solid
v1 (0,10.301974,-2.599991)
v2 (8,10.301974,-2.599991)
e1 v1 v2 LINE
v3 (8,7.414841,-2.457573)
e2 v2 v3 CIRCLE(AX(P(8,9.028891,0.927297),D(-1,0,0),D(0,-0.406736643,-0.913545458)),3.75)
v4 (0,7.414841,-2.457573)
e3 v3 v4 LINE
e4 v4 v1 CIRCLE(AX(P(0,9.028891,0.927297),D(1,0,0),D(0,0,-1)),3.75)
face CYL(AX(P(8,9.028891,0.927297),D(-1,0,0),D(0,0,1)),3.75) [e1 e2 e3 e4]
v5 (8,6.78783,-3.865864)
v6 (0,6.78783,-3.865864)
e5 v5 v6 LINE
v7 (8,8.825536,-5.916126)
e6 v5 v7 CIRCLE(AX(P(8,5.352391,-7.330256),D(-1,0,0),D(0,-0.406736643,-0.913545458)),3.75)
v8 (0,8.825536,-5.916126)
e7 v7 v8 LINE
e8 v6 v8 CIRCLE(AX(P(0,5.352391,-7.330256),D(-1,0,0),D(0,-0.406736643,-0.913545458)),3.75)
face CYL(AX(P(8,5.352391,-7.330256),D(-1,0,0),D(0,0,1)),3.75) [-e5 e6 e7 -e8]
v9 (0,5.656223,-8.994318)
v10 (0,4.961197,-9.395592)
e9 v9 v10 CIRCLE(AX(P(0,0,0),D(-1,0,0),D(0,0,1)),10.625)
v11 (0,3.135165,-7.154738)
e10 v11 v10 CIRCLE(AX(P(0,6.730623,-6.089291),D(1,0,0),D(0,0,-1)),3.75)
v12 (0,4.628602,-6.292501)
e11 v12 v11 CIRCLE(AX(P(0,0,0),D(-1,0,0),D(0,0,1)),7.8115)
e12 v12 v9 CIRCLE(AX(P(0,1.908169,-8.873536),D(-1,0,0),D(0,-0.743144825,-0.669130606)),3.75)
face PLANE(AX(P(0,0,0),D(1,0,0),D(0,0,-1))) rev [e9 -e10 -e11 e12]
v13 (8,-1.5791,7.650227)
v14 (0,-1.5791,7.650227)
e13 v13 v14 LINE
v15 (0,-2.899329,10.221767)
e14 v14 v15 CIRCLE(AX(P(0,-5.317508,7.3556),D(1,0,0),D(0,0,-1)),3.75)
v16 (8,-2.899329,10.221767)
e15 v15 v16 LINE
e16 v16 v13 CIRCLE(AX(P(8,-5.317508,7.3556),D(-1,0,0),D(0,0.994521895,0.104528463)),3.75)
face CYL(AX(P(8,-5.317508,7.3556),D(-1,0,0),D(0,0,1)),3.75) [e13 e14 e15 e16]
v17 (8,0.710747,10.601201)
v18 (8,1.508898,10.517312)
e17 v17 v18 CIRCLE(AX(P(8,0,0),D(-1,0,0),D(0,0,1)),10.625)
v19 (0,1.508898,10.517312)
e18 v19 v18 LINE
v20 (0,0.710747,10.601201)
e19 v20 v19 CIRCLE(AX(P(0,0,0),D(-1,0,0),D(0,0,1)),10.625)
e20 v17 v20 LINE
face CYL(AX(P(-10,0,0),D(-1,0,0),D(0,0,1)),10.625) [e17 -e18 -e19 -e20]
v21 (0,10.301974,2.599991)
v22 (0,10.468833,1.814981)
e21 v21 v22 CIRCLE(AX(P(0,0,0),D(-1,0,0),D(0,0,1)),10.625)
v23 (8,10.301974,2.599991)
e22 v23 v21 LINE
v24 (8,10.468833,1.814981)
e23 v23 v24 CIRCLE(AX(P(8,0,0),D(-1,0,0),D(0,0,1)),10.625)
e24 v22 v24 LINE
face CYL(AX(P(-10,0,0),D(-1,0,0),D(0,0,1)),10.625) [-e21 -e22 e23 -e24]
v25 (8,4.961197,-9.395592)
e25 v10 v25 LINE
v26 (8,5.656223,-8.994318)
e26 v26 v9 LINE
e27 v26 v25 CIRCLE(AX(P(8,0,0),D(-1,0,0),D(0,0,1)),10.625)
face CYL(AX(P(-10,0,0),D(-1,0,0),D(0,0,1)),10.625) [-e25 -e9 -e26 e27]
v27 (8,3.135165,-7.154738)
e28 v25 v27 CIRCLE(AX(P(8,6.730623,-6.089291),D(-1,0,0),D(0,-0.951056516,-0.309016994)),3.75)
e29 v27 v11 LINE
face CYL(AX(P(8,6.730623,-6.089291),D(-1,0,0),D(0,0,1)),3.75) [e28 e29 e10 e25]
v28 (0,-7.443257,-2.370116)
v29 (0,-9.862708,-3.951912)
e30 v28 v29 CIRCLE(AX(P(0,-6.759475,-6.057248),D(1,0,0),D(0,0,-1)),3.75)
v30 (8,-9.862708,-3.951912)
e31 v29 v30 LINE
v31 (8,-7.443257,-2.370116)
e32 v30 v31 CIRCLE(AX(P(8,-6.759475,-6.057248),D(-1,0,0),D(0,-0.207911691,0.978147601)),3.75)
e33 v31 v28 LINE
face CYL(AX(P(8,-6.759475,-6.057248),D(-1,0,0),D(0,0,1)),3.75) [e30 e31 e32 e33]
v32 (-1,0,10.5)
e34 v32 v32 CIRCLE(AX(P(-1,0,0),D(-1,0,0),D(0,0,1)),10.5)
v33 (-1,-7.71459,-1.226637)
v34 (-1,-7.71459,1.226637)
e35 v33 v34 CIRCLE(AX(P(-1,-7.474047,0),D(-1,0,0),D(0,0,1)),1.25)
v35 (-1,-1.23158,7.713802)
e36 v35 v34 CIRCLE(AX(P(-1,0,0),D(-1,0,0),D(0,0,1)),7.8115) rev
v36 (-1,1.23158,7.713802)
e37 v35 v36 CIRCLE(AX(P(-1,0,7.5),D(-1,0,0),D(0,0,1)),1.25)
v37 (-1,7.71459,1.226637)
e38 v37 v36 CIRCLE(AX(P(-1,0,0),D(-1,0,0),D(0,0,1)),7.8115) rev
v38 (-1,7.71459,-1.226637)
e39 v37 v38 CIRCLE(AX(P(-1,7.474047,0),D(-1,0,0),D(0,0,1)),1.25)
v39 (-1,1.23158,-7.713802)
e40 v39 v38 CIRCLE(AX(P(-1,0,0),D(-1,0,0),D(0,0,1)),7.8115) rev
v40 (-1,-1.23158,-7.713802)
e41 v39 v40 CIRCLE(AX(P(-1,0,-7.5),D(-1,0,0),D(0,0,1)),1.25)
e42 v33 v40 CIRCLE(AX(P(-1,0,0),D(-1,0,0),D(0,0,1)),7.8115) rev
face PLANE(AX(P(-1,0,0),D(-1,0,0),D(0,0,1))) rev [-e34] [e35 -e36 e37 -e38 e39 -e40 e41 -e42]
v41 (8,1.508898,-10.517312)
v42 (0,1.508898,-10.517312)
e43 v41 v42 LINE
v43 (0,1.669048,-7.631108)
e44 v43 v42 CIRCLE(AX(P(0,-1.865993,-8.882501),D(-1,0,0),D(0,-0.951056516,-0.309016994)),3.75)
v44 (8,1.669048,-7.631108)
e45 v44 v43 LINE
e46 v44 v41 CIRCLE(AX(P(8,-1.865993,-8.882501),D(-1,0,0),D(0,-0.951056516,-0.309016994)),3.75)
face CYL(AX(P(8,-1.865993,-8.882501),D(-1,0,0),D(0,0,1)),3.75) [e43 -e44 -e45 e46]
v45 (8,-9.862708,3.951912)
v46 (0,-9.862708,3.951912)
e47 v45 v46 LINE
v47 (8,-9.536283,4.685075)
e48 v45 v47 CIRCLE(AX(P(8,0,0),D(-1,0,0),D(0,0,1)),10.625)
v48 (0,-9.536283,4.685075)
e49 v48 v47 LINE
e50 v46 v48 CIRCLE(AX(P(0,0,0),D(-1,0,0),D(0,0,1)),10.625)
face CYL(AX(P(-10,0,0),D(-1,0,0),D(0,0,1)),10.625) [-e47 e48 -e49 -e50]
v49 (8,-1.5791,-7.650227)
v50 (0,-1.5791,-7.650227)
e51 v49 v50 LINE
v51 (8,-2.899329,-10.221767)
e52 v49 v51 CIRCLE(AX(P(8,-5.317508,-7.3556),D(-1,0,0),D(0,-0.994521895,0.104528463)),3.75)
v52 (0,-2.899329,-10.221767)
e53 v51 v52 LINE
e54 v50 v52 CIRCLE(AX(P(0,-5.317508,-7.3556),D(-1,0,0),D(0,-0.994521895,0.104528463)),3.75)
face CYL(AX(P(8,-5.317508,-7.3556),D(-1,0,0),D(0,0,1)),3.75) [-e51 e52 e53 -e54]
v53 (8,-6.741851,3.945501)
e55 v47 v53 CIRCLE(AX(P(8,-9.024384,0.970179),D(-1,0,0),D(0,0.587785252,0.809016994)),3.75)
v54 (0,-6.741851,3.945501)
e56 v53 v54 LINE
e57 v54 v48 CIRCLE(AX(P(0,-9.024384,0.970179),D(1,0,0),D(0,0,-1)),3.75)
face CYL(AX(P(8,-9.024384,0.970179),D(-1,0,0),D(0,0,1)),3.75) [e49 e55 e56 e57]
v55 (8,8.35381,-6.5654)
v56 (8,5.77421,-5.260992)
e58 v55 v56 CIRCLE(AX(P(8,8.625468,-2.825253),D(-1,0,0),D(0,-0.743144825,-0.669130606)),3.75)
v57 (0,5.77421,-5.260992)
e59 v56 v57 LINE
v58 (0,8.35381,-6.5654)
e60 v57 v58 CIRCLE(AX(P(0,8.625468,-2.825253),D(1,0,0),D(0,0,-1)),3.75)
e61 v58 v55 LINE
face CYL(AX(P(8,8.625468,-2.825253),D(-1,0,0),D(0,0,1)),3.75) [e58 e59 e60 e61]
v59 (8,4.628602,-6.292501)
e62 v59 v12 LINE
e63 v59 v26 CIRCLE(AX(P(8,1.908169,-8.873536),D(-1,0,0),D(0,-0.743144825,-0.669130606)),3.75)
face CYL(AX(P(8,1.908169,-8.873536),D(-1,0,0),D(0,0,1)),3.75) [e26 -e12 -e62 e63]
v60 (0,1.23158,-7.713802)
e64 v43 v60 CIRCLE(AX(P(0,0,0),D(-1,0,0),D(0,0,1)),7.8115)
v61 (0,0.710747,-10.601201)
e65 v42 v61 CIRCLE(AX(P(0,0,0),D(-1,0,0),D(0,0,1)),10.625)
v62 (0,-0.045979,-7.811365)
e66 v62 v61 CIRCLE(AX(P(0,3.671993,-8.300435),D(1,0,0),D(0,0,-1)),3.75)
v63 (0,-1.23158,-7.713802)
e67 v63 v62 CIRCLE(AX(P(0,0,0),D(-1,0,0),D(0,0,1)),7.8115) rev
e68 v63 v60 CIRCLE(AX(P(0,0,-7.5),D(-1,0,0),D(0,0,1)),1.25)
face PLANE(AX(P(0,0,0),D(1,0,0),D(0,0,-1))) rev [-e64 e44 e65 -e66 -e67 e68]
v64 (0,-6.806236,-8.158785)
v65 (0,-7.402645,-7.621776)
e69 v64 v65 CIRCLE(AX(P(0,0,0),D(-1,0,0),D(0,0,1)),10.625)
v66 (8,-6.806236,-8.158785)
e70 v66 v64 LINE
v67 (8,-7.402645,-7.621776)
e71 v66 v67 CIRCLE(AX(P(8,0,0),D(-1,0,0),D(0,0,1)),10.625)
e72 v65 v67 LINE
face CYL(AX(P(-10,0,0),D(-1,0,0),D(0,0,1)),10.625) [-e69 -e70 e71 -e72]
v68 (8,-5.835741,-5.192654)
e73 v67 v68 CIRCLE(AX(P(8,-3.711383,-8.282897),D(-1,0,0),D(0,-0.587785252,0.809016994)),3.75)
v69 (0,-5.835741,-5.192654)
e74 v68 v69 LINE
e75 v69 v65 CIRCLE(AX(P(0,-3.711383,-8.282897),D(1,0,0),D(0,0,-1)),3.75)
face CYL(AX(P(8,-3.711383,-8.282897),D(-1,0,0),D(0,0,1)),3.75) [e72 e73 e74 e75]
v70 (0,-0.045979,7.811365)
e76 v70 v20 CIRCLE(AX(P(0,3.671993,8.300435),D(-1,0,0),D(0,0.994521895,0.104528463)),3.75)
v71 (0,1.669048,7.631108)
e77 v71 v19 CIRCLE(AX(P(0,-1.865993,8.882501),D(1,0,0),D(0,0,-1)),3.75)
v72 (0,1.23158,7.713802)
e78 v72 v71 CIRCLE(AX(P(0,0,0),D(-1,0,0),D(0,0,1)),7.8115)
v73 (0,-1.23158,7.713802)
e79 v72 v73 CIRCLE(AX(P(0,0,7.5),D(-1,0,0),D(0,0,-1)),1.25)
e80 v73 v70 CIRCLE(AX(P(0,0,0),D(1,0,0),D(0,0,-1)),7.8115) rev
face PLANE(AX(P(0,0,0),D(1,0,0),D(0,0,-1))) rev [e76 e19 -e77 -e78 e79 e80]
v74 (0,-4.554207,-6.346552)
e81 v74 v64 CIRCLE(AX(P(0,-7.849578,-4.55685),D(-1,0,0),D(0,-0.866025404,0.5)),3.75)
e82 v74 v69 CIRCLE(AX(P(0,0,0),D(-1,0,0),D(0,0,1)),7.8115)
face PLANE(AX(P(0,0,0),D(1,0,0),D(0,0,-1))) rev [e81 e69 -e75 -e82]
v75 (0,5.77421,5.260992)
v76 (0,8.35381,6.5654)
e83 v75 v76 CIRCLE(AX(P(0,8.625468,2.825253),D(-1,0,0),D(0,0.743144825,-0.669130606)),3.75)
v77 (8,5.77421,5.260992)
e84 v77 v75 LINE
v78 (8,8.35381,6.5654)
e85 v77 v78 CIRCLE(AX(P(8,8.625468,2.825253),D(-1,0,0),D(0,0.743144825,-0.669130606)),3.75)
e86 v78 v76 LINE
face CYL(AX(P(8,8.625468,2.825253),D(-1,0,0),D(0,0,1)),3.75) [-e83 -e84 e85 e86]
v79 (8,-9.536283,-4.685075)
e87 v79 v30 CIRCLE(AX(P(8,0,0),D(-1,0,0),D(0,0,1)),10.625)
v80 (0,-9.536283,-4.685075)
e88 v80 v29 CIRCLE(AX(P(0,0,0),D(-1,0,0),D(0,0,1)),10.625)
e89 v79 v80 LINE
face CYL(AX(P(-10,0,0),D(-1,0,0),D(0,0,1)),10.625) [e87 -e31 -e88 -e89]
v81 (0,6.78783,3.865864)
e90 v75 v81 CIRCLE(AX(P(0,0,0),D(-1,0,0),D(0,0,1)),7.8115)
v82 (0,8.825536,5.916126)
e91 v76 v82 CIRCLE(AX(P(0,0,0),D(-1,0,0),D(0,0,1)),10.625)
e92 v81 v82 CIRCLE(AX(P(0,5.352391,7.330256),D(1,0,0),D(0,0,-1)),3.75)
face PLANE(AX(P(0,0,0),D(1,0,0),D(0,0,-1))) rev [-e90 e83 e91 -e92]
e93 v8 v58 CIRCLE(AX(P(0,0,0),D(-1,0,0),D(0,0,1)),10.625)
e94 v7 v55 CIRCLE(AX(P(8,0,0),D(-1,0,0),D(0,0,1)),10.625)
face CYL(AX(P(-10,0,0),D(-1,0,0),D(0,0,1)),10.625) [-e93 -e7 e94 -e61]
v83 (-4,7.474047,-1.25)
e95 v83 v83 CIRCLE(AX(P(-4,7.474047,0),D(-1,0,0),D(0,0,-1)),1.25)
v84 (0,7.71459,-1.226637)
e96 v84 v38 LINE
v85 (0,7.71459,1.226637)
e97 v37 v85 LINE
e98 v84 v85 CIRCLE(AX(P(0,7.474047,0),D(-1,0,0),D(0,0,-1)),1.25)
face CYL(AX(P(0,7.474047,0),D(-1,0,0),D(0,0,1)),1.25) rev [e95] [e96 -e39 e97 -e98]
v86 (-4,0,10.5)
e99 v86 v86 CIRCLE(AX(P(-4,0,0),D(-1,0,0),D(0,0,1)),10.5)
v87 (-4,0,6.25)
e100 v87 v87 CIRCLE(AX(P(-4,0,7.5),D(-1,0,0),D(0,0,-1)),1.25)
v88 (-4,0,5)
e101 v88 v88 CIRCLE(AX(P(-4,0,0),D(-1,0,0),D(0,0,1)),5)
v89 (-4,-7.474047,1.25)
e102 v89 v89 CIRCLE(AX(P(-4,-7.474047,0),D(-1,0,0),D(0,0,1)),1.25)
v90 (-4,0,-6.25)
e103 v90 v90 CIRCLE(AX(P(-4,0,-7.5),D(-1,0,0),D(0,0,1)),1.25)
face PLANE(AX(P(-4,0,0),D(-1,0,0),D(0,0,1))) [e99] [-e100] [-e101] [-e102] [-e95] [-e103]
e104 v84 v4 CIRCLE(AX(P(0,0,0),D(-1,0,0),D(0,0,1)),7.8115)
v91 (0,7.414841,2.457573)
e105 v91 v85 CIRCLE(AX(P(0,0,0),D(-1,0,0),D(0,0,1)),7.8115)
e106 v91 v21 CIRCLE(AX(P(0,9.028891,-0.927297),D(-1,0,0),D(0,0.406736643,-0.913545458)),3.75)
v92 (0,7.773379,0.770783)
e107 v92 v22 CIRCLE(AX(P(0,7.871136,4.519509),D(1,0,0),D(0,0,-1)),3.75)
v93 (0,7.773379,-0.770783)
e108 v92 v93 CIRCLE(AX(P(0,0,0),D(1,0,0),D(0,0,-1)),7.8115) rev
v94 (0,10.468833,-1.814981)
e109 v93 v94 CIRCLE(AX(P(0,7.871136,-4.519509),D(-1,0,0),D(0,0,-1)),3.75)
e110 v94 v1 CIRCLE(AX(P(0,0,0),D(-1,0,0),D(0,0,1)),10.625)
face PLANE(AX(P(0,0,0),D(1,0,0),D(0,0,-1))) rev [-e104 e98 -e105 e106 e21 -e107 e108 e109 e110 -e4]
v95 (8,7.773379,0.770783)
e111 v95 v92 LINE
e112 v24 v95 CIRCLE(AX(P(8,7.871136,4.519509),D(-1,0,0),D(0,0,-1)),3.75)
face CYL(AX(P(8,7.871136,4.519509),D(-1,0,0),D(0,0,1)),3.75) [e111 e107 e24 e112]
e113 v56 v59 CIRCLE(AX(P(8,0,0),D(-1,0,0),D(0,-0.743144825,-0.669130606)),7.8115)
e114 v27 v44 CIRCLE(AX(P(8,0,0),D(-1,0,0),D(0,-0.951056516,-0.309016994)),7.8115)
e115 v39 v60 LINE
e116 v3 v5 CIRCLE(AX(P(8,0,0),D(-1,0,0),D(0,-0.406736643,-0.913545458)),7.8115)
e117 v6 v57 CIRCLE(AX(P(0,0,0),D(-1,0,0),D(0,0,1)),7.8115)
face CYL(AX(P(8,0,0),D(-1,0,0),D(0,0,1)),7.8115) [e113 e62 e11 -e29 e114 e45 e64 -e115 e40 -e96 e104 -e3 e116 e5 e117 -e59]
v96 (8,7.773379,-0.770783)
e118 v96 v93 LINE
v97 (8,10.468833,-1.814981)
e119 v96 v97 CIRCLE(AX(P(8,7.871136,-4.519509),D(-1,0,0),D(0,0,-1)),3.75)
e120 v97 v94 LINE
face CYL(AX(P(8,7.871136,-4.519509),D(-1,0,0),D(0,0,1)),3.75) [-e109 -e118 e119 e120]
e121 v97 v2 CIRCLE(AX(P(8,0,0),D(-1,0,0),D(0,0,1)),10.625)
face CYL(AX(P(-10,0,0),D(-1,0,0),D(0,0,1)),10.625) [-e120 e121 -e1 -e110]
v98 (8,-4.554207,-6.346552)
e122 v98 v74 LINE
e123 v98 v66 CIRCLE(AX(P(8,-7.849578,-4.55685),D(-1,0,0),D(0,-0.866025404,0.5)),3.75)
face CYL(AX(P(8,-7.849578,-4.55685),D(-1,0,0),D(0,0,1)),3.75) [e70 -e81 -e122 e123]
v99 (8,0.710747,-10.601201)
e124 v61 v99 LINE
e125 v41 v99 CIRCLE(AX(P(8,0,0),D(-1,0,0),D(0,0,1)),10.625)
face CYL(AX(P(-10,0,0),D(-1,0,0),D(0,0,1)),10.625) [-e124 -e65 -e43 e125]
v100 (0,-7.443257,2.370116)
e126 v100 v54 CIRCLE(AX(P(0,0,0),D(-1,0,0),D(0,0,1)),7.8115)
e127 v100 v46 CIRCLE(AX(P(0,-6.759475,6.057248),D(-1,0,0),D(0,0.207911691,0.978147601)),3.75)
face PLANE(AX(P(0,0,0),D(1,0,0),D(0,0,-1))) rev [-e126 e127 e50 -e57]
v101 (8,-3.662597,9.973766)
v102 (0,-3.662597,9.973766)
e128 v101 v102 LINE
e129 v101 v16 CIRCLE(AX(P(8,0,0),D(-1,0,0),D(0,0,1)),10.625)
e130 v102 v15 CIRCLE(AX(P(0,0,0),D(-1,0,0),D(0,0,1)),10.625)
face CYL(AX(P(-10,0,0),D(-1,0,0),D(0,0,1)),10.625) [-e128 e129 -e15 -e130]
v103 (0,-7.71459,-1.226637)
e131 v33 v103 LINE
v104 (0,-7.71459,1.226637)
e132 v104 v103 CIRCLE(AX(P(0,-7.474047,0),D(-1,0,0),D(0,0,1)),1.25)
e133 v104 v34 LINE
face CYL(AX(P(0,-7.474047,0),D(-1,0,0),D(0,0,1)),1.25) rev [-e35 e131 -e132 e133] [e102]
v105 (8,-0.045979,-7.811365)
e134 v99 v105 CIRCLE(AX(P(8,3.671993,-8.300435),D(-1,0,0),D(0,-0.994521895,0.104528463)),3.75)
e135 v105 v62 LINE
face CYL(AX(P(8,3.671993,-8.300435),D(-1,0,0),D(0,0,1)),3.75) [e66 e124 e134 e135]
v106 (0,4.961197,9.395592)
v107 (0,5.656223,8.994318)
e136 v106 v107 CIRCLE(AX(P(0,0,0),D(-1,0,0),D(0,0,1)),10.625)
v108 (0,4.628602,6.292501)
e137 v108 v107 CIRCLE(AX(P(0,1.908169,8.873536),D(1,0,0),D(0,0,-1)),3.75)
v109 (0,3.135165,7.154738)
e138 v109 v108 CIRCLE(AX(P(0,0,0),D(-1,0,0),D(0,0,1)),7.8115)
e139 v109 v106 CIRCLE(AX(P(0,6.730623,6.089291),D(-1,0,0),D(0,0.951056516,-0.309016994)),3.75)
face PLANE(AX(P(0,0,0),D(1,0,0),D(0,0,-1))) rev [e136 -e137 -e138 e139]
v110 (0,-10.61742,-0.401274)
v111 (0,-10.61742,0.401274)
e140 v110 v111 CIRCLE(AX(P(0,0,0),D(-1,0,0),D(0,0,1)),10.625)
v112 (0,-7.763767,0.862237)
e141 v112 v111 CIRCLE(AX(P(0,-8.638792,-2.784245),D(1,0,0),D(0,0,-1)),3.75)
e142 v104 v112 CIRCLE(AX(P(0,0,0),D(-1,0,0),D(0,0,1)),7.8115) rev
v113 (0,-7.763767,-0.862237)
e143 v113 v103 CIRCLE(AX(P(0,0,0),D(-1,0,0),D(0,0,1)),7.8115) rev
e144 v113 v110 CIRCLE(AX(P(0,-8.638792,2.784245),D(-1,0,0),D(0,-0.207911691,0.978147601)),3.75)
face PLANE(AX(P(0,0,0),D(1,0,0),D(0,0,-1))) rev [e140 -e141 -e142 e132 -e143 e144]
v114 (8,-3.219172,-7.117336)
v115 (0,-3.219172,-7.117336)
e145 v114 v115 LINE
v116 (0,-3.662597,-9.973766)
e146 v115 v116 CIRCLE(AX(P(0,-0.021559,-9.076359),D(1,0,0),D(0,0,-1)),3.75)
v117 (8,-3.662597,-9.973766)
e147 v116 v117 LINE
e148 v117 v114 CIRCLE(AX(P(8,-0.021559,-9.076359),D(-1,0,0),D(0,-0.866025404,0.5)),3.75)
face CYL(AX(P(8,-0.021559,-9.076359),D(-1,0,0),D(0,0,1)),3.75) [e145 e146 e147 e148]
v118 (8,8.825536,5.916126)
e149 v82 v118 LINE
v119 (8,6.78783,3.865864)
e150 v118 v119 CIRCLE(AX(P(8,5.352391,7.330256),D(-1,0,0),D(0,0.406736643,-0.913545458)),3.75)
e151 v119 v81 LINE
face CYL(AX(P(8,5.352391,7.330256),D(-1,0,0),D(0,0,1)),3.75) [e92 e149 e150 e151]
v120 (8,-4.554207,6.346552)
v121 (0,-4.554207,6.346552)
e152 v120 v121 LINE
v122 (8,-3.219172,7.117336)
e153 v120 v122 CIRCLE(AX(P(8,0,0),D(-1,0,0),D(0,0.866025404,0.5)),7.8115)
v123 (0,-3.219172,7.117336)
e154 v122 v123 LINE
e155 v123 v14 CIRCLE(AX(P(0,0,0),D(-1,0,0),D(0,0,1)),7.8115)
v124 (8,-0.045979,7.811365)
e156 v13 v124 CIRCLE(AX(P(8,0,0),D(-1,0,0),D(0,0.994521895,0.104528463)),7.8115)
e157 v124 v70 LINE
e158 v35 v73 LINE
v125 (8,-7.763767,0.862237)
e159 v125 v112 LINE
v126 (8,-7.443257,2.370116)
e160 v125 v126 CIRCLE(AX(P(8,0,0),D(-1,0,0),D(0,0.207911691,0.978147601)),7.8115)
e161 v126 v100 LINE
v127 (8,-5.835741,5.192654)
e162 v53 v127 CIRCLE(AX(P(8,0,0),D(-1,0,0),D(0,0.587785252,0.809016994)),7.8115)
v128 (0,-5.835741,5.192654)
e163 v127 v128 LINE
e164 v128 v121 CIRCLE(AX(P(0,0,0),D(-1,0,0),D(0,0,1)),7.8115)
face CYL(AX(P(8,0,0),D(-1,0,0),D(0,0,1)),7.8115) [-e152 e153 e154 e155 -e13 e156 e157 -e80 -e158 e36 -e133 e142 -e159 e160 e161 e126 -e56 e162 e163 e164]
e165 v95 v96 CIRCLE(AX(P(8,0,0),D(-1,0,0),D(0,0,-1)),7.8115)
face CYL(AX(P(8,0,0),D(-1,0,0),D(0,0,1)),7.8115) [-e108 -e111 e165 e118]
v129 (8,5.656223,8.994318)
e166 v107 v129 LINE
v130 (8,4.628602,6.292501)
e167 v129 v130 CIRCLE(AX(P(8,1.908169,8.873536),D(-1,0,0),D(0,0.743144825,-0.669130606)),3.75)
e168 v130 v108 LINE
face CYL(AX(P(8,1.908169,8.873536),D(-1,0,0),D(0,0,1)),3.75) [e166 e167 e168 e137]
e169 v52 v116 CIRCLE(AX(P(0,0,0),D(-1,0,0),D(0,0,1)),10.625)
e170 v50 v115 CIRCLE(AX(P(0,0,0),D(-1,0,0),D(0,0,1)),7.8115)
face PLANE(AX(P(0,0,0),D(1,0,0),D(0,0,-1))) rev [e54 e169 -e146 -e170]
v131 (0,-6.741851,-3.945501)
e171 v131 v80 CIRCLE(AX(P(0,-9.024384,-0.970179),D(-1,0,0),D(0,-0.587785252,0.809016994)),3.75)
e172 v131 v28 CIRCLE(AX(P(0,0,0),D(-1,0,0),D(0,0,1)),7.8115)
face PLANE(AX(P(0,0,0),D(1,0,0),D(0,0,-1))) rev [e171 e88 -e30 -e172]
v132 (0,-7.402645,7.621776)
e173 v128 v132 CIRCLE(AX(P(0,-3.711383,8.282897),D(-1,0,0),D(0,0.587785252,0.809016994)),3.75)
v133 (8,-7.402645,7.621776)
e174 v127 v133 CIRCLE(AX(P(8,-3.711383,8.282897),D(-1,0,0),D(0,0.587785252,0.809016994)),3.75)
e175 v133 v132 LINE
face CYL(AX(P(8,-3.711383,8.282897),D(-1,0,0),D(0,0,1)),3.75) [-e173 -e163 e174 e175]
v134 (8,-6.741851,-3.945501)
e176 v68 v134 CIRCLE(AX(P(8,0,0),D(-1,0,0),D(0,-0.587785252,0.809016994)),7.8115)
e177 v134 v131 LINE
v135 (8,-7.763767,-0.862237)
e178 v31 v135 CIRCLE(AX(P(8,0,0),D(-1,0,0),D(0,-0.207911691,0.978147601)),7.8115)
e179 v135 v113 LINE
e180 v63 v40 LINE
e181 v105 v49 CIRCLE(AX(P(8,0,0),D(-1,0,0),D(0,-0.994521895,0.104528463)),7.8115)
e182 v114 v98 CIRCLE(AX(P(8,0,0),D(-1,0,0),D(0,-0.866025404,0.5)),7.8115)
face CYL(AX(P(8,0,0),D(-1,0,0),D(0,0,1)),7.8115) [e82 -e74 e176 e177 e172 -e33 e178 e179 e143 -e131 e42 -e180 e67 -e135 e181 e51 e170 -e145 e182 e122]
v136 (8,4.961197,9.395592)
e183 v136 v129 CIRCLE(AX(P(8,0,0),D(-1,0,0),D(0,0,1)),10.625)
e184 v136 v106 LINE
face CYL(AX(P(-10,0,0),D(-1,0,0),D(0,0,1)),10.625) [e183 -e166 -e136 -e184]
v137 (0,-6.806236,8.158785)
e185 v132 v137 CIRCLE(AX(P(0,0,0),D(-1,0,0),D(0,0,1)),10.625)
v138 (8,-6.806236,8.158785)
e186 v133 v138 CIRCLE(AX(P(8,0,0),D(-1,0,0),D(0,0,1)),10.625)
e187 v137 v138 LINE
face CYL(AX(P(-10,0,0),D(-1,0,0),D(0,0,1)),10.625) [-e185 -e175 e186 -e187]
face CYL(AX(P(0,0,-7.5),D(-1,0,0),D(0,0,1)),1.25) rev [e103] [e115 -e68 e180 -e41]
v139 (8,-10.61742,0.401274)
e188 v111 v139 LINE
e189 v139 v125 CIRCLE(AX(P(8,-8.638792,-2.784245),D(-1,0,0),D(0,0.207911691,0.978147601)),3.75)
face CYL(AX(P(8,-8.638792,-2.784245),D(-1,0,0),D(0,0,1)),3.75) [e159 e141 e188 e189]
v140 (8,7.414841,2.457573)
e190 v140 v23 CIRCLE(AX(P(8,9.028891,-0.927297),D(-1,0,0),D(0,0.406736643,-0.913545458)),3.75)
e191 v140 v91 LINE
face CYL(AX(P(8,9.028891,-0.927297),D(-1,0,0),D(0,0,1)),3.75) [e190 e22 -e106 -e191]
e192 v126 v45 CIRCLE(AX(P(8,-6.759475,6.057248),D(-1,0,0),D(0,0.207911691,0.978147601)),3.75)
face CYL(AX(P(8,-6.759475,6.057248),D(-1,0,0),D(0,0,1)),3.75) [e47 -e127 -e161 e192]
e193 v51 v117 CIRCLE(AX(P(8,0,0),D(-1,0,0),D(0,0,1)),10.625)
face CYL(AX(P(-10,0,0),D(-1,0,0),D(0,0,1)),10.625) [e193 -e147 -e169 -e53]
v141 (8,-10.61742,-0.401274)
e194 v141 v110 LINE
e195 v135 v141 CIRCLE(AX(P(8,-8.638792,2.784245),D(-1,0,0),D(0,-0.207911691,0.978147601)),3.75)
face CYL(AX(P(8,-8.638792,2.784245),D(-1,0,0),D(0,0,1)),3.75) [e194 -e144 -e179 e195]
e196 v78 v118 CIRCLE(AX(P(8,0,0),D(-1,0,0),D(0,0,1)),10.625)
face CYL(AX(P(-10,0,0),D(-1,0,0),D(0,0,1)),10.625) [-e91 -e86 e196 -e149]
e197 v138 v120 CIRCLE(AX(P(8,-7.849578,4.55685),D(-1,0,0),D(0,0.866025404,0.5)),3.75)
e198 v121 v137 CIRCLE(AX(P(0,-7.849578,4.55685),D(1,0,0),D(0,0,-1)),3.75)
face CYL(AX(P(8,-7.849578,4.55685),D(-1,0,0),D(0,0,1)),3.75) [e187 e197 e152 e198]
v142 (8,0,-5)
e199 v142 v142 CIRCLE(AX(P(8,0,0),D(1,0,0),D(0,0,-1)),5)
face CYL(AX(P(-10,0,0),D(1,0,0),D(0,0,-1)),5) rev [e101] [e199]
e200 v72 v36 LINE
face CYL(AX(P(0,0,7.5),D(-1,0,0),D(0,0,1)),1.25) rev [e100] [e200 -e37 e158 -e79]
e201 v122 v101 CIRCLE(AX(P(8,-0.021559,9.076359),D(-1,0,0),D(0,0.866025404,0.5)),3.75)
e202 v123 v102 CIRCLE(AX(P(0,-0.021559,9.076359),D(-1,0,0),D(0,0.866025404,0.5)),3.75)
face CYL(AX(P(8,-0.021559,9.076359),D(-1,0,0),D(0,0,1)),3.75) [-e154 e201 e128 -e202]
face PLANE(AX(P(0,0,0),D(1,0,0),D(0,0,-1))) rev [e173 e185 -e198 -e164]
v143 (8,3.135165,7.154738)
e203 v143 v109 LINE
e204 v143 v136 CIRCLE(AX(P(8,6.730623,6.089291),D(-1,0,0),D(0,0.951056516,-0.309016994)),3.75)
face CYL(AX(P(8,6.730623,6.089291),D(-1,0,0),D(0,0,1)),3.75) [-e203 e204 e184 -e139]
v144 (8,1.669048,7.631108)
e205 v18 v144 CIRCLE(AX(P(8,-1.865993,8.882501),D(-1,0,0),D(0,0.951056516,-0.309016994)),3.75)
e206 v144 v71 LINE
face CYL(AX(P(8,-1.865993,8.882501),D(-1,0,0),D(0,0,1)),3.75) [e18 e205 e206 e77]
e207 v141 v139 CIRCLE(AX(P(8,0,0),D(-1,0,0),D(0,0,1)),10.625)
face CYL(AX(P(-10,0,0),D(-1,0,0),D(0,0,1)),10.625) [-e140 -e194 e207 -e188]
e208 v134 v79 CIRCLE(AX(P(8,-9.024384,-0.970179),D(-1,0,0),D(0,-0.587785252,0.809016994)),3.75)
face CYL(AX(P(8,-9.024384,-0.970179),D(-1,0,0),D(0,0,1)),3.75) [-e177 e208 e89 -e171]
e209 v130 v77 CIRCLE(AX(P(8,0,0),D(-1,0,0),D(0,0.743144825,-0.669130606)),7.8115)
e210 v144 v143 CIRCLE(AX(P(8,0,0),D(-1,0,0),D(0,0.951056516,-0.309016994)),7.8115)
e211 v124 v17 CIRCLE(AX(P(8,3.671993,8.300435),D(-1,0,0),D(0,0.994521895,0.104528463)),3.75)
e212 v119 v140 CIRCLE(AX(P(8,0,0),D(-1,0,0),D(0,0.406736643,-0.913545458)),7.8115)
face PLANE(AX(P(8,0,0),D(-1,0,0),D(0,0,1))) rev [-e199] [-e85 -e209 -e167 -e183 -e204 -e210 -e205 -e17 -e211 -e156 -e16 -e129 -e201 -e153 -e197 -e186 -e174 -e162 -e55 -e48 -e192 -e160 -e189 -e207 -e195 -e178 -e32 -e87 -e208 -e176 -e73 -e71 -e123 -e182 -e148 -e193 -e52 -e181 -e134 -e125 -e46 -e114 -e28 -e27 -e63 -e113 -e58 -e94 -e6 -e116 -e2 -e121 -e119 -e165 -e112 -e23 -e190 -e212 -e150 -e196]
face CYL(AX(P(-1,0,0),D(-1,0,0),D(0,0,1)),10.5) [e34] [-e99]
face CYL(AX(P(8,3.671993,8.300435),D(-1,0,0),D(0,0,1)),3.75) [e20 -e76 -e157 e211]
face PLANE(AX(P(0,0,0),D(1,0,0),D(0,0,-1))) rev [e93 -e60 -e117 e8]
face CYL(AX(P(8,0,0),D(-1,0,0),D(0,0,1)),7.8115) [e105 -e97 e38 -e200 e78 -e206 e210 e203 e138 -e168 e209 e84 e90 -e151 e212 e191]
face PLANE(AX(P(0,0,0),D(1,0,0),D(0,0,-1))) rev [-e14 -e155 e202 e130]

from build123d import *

# Parameters (mm, degrees)
OTHER_269_OUTLINE_R = 2.5
OTHER_269_DEPTH     = 8
EXTRUDE_START       = 4
SKETCH_1_R          = 7.8115
EXTRUDE_1_DEPTH     = 4
SKETCH_2_R          = 10.5
EXTRUDE_2_DEPTH     = 3
SKETCH_3_R          = 5
CUT_EXTRUDE_1_DEPTH = 18
SKETCH_4_R          = 1.25
CUT_EXTRUDE_2_DEPTH = 4


# Read off the part's stored shape, not the designer's step: звезда к рейки
with BuildPart() as part:
    # Other 269 outline → Other 269 (new body)
    with BuildSketch(Plane.YZ):
        with BuildLine():
            ThreePointArc((1.50889806, 10.517311997), (1.110614922, 10.566795138), (0.710747103, 10.601201043))
            ThreePointArc((0.710747103, 10.601201043), (0.052768817, 9.282126803), (-0.045978646, 7.811364683))
            ThreePointArc((-0.045978646, 7.811364683), (-0.816524091, 7.768707786), (-1.579100136, 7.650227121))
            ThreePointArc((-1.579100136, 7.650227121), (-1.98147837, 9.068318808), (-2.899329207, 10.221766733))
            ThreePointArc((-2.899329207, 10.221766733), (-3.283305565, 10.104975486), (-3.662597137, 9.973765949))
            ThreePointArc((-3.662597137, 9.973765949), (-3.727174383, 8.50110779), (-3.219171833, 7.117335524))
            ThreePointArc((-3.219171833, 7.117335524), (-3.90575, 6.764957442), (-4.554207455, 6.346552348))
            ThreePointArc((-4.554207455, 6.346552348), (-5.498588115, 7.478381595), (-6.806236115, 8.158785139))
            ThreePointArc((-6.806236115, 8.158785139), (-7.109512693, 7.895913771), (-7.402645059, 7.621776114))
            ThreePointArc((-7.402645059, 7.621776114), (-6.862655273, 6.250170009), (-5.835740964, 5.192654394))
            ThreePointArc((-5.835740964, 5.192654394), (-6.319636252, 4.591484498), (-6.741850931, 3.945501017))
            ThreePointArc((-6.741850931, 3.945501017), (-8.064942021, 4.595364266), (-9.536282966, 4.685075474))
            ThreePointArc((-9.536282966, 4.685075474), (-9.706420487, 4.321576832), (-9.862708399, 3.951911947))
            ThreePointArc((-9.862708399, 3.951911947), (-8.81152072, 2.918521053), (-7.443257466, 2.370116145))
            ThreePointArc((-7.443257466, 2.370116145), (-7.640799983, 1.624102173), (-7.763767133, 0.862236717))
            ThreePointArc((-7.763767133, 0.862236717), (-9.236794185, 0.917766707), (-10.617419857, 0.401273697))
            ThreePointArc((-10.617419857, 0.401273697), (-10.625, 0), (-10.617419857, -0.401273697))
            ThreePointArc((-10.617419857, -0.401273697), (-9.236794185, -0.917766707), (-7.763767133, -0.862236717))
            ThreePointArc((-7.763767133, -0.862236717), (-7.640799983, -1.624102173), (-7.443257466, -2.370116145))
            ThreePointArc((-7.443257466, -2.370116145), (-8.81152072, -2.918521053), (-9.862708399, -3.951911947))
            ThreePointArc((-9.862708399, -3.951911947), (-9.706420487, -4.321576832), (-9.536282966, -4.685075474))
            ThreePointArc((-9.536282966, -4.685075474), (-8.064942021, -4.595364266), (-6.741850931, -3.945501017))
            ThreePointArc((-6.741850931, -3.945501017), (-6.319636252, -4.591484498), (-5.835740964, -5.192654394))
            ThreePointArc((-5.835740964, -5.192654394), (-6.862655273, -6.250170009), (-7.402645059, -7.621776114))
            ThreePointArc((-7.402645059, -7.621776114), (-7.109512693, -7.895913771), (-6.806236115, -8.158785139))
            ThreePointArc((-6.806236115, -8.158785139), (-5.498588115, -7.478381595), (-4.554207455, -6.346552348))
            ThreePointArc((-4.554207455, -6.346552348), (-3.90575, -6.764957442), (-3.219171833, -7.117335524))
            ThreePointArc((-3.219171833, -7.117335524), (-3.727174383, -8.50110779), (-3.662597137, -9.973765949))
            ThreePointArc((-3.662597137, -9.973765949), (-3.283305565, -10.104975486), (-2.899329207, -10.221766733))
            ThreePointArc((-2.899329207, -10.221766733), (-1.98147837, -9.068318808), (-1.579100136, -7.650227121))
            ThreePointArc((-1.579100136, -7.650227121), (-0.816524091, -7.768707786), (-0.045978646, -7.811364683))
            ThreePointArc((-0.045978646, -7.811364683), (0.052768817, -9.282126803), (0.710747103, -10.601201043))
            ThreePointArc((0.710747103, -10.601201043), (1.110614922, -10.566795138), (1.50889806, -10.517311997))
            ThreePointArc((1.50889806, -10.517311997), (1.878246986, -9.090261316), (1.669047941, -7.631108125))
            ThreePointArc((1.669047941, -7.631108125), (2.413886252, -7.429177977), (3.135164666, -7.154737925))
            ThreePointArc((3.135164666, -7.154737925), (3.82358781, -8.458181767), (4.961196713, -9.395592168))
            ThreePointArc((4.961196713, -9.395592168), (5.3125, -9.201519915), (5.656223144, -8.99431847))
            ThreePointArc((5.656223144, -8.99431847), (5.413206375, -7.54041506), (4.628602467, -6.292501208))
            ThreePointArc((4.628602467, -6.292501208), (5.226913732, -5.805075804), (5.774209525, -5.26099198))
            ThreePointArc((5.774209525, -5.26099198), (6.933273734, -6.171740263), (8.353810339, -6.56540005))
            ThreePointArc((8.353810339, -6.56540005), (8.595805565, -6.245218306), (8.825535862, -5.916125569))
            ThreePointArc((8.825535862, -5.916125569), (8.012173204, -4.686762538), (6.787829577, -3.865863666))
            ThreePointArc((6.787829577, -3.865863666), (7.136160342, -3.177223287), (7.4148411, -2.457572728))
            ThreePointArc((7.4148411, -2.457572728), (8.844133643, -2.818148799), (10.301974266, -2.599990619))
            ThreePointArc((10.301974266, -2.599990619), (10.392818258, -2.209061715), (10.468833252, -1.81498081))
            ThreePointArc((10.468833252, -1.81498081), (9.225762498, -1.022726195), (7.773379287, -0.770783176))
            ThreePointArc((7.773379287, -0.770783176), (7.8115, 0), (7.773379287, 0.770783176))
            ThreePointArc((7.773379287, 0.770783176), (9.225762498, 1.022726195), (10.468833252, 1.81498081))
            ThreePointArc((10.468833252, 1.81498081), (10.392818258, 2.209061715), (10.301974266, 2.599990619))
            ThreePointArc((10.301974266, 2.599990619), (8.844133643, 2.818148799), (7.4148411, 2.457572728))
            ThreePointArc((7.4148411, 2.457572728), (7.136160342, 3.177223287), (6.787829577, 3.865863666))
            ThreePointArc((6.787829577, 3.865863666), (8.012173204, 4.686762538), (8.825535862, 5.916125569))
            ThreePointArc((8.825535862, 5.916125569), (8.595805565, 6.245218306), (8.353810339, 6.56540005))
            ThreePointArc((8.353810339, 6.56540005), (6.933273734, 6.171740263), (5.774209525, 5.26099198))
            ThreePointArc((5.774209525, 5.26099198), (5.226913732, 5.805075804), (4.628602467, 6.292501208))
            ThreePointArc((4.628602467, 6.292501208), (5.413206375, 7.54041506), (5.656223144, 8.99431847))
            ThreePointArc((5.656223144, 8.99431847), (5.3125, 9.201519915), (4.961196713, 9.395592168))
            ThreePointArc((4.961196713, 9.395592168), (3.82358781, 8.458181767), (3.135164666, 7.154737925))
            ThreePointArc((3.135164666, 7.154737925), (2.413886252, 7.429177977), (1.669047941, 7.631108125))
            ThreePointArc((1.669047941, 7.631108125), (1.878246986, 9.090261316), (1.50889806, 10.517311997))
        make_face()
        Circle(OTHER_269_OUTLINE_R, mode=Mode.SUBTRACT)
    extrude(amount=OTHER_269_DEPTH)

    # Эскиз1 → Бобышка-Вытянуть1 (add)
    with BuildSketch(Plane.ZY.offset(EXTRUDE_START)):
        Circle(SKETCH_1_R)
    extrude(amount=-EXTRUDE_1_DEPTH)

    # Эскиз2 → Бобышка-Вытянуть2 (add)
    with BuildSketch(Plane.ZY.offset(4)):
        Circle(SKETCH_2_R)
    extrude(amount=-EXTRUDE_2_DEPTH)

    # Эскиз3 → Вырез-Вытянуть1 (cut)
    with BuildSketch(Plane(origin=(8, 0, 0), x_dir=(0, 0, -1), z_dir=(1, 0, 0))):
        Circle(SKETCH_3_R)
    extrude(amount=-CUT_EXTRUDE_1_DEPTH, mode=Mode.SUBTRACT)

    # Эскиз4 → Вырез-Вытянуть2 (cut)
    with BuildSketch(Plane.ZY.offset(4)):
        with Locations((-7.5, 0)):
            Circle(SKETCH_4_R)
        with Locations((0, -7.474046633)):
            Circle(SKETCH_4_R)
        with Locations(Location((7.5, 0, 0), (0, 0, 279.848392372))):
            Circle(SKETCH_4_R)
        with Locations(Location((0, 7.474046633, 0), (0, 0, 11.094887122))):
            Circle(SKETCH_4_R)
    extrude(amount=-CUT_EXTRUDE_2_DEPTH, mode=Mode.SUBTRACT)


solid = part.part
